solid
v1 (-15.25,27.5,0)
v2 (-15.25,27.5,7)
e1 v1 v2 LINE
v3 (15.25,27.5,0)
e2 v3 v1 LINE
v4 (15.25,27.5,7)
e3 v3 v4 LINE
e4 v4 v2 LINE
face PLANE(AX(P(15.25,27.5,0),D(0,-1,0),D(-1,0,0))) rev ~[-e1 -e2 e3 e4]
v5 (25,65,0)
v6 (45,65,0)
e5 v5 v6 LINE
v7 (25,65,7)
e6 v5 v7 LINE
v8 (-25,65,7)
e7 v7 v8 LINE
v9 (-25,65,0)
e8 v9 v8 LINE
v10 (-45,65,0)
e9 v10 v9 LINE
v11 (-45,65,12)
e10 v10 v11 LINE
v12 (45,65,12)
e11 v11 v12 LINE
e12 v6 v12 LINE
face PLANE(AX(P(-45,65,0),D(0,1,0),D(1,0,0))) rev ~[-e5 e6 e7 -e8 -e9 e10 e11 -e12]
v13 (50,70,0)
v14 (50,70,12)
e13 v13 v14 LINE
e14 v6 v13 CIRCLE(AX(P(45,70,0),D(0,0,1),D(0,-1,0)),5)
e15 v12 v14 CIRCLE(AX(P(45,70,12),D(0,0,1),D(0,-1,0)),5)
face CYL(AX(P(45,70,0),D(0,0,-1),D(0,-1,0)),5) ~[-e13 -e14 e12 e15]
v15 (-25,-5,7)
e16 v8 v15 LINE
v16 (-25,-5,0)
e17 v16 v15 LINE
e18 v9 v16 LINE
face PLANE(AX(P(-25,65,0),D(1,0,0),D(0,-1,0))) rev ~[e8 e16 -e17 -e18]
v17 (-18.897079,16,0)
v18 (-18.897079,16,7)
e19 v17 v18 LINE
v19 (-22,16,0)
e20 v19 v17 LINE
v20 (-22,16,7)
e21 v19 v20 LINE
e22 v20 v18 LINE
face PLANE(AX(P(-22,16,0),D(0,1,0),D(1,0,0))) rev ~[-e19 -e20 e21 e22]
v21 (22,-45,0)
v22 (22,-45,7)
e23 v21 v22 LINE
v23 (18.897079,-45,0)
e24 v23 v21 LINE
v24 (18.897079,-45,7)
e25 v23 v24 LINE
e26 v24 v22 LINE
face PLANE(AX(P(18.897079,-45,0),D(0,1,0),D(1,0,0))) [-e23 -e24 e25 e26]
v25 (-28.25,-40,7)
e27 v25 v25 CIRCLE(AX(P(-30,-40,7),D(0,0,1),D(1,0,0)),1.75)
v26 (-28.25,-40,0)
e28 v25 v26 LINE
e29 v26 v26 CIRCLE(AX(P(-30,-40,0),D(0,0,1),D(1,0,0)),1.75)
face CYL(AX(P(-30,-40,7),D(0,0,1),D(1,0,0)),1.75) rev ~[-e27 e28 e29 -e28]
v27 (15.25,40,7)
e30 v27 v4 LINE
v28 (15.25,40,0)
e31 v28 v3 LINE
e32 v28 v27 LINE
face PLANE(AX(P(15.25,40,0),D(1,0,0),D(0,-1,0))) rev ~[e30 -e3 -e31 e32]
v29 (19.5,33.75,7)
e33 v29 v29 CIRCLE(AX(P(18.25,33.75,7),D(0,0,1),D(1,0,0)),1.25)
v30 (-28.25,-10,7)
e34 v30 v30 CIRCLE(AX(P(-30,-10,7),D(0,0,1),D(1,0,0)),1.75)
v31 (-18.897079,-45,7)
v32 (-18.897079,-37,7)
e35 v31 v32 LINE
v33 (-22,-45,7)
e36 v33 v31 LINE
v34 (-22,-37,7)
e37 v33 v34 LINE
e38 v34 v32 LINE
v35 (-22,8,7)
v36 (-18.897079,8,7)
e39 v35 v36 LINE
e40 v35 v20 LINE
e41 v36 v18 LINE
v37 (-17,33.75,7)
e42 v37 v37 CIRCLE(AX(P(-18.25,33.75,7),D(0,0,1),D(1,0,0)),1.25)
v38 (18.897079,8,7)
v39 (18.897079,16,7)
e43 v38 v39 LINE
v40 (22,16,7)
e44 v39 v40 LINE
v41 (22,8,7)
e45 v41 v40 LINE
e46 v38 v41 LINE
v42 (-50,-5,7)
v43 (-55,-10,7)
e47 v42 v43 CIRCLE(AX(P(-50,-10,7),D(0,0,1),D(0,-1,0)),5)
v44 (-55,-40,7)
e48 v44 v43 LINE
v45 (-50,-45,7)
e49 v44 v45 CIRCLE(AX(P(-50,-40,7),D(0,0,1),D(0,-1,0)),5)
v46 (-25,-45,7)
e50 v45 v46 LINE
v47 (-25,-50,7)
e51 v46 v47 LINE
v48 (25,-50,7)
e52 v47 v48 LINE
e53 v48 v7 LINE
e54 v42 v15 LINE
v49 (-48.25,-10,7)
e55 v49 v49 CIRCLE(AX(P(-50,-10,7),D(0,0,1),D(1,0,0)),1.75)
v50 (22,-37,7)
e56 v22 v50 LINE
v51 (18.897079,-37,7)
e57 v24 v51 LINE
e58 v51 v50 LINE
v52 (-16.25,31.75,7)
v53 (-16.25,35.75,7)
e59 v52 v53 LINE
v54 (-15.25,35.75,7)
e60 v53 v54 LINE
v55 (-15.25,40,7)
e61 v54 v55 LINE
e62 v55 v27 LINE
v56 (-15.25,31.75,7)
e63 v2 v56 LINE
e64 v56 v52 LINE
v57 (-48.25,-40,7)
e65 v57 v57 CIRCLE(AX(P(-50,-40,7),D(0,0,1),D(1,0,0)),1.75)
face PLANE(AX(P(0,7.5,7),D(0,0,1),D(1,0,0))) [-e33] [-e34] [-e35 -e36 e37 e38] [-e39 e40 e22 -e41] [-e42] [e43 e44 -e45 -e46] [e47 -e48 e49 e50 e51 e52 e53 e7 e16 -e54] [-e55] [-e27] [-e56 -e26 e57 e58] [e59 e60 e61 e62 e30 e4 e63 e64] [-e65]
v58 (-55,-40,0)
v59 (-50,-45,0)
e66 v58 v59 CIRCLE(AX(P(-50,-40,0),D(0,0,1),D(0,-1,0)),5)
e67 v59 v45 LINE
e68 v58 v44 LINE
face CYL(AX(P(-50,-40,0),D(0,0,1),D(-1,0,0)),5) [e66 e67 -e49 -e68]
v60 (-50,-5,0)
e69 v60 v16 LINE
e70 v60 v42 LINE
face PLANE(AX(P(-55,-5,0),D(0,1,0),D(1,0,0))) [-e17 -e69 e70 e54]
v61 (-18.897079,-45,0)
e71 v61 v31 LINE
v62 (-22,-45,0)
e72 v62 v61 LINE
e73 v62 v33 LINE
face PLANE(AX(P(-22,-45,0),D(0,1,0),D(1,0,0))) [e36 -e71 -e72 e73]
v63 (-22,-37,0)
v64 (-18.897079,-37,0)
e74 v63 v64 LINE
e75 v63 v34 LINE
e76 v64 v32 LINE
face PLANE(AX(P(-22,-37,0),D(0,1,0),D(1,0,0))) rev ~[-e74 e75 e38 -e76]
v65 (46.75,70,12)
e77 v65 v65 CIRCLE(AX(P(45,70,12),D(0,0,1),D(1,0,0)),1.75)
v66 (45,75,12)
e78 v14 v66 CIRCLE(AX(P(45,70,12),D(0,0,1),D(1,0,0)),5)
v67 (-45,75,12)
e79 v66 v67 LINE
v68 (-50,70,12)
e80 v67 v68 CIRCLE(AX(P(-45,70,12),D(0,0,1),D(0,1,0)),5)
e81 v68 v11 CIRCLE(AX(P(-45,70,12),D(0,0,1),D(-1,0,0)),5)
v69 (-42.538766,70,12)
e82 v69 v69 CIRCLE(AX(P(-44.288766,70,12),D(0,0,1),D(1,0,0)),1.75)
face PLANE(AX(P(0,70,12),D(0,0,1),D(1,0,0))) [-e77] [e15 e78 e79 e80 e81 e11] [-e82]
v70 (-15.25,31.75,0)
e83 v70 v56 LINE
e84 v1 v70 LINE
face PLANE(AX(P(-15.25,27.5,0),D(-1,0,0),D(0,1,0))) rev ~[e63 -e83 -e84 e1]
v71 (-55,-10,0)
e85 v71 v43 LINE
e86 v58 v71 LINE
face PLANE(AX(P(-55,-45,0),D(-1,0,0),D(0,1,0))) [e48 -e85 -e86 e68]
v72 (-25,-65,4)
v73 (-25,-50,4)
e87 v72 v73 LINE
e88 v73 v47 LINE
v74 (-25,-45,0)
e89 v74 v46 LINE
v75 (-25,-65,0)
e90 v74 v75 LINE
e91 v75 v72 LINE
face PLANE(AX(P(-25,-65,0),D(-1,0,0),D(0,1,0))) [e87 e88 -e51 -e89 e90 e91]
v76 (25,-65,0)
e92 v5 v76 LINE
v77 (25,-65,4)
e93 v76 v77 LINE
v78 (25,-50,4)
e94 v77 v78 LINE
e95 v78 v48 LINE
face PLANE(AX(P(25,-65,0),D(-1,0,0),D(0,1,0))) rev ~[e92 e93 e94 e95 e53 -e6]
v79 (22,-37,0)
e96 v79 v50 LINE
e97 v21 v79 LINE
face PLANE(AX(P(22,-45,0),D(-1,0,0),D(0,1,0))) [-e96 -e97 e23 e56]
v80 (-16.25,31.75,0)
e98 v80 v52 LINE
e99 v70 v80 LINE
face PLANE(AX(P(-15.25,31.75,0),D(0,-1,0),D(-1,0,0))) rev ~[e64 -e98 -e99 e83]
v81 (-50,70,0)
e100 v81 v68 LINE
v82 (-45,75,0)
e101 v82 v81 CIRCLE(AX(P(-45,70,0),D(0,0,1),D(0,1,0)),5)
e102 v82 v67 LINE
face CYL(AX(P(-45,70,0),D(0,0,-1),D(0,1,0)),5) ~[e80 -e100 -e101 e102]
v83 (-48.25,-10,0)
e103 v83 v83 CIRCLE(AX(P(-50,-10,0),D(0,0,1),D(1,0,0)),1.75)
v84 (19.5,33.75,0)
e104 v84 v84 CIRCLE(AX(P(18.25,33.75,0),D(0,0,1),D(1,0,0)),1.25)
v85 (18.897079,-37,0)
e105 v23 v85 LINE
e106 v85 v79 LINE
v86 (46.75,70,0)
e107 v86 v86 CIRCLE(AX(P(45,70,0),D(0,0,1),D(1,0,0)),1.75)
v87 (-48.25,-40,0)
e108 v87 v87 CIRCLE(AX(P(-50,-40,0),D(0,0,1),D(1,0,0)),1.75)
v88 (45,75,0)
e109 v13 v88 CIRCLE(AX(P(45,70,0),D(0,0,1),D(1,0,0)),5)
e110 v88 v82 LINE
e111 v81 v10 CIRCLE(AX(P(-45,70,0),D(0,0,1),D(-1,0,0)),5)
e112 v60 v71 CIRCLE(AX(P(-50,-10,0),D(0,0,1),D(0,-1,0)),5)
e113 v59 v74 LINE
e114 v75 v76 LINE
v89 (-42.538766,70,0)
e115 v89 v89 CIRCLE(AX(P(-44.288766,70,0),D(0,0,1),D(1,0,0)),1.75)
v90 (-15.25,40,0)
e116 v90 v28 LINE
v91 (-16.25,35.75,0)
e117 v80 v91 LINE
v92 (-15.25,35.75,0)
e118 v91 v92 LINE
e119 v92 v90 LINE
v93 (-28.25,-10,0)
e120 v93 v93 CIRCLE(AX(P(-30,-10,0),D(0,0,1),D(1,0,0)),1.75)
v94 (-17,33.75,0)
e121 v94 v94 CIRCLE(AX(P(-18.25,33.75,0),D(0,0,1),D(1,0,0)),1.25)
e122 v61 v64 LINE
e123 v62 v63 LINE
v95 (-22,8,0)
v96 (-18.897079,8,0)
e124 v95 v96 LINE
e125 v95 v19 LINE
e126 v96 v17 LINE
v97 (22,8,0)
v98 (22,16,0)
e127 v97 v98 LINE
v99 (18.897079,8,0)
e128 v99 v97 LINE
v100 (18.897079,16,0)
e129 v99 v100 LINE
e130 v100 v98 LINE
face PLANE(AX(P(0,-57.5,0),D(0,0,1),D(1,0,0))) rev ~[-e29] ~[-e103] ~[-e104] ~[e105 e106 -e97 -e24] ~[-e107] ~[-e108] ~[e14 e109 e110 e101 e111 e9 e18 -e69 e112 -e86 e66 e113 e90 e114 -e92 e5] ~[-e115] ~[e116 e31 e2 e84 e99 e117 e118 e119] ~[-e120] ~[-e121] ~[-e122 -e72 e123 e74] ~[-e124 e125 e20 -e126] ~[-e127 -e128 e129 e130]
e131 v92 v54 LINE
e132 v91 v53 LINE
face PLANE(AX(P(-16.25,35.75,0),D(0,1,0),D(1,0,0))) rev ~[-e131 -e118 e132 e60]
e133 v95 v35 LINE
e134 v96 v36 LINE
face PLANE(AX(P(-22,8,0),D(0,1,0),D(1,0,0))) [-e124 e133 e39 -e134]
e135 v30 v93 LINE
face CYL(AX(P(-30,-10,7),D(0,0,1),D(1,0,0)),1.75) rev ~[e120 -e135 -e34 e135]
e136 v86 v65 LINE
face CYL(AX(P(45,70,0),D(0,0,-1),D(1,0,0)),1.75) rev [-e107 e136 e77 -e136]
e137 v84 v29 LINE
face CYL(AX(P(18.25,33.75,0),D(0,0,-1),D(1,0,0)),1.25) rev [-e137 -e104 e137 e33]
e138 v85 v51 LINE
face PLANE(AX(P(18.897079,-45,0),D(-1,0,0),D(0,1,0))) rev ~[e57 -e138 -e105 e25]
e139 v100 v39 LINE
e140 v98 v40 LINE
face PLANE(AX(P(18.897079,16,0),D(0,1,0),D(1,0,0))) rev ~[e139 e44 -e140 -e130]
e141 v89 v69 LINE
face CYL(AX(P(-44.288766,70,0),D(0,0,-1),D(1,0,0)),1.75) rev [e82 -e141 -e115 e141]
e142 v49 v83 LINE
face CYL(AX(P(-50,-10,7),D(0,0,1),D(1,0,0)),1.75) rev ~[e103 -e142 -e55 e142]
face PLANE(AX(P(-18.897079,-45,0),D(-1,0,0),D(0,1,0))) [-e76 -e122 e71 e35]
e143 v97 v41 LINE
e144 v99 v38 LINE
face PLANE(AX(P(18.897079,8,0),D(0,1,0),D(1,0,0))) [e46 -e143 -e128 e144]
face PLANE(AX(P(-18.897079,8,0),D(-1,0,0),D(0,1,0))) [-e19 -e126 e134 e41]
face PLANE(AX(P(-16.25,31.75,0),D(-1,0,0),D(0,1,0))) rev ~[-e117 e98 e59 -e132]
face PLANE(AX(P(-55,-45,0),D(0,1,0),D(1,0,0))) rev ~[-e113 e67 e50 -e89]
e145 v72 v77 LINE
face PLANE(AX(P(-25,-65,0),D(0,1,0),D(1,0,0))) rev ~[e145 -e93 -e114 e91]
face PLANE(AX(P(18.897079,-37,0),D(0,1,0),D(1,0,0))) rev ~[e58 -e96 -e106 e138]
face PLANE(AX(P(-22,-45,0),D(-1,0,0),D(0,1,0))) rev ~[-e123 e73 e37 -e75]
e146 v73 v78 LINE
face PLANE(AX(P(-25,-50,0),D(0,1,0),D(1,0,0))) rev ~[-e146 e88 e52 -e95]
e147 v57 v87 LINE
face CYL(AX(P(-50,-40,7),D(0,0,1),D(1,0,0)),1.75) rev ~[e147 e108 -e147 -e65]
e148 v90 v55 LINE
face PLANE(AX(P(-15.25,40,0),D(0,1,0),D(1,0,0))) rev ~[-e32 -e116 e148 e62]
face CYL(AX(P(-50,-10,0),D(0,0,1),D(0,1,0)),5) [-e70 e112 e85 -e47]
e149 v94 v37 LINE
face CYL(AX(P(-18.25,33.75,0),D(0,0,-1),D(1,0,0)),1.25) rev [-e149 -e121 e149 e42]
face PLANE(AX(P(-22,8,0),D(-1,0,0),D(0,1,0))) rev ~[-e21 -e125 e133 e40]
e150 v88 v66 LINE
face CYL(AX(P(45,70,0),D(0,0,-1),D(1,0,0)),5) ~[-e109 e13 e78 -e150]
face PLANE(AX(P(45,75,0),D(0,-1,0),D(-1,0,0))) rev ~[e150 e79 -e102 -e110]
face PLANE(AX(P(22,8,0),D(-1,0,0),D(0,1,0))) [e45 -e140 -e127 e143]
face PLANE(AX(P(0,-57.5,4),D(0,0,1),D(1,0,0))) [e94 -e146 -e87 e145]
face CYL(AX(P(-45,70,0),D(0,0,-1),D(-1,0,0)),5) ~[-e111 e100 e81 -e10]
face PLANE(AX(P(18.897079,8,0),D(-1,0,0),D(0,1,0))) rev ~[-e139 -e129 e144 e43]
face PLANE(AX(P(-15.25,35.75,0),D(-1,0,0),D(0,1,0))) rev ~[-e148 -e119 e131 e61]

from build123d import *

# Parameters (mm, degrees)
F0_W     = 3.1029209495
F0_H     = 8
F0_R     = 1.25
F1_DEPTH = 7
F0_R_2   = 1.75
F2_DEPTH = 12
F0_W_2   = 30
F0_H_2   = 40
F3_DEPTH = 7
F4_R     = 5
F5_R     = 1.75
F6_DEPTH = 25
F0_W_3   = 50
F0_H_3   = 15
F7_DEPTH = 4


with BuildPart() as f1:
    # F0 (on Top) → F1 (new body)
    with BuildSketch(Plane.XY):
        Polygon((25, -50), (25, 65), (-25, 65), (-25, -5), (-25, -45), (-25, -50), align=None)
        with Locations((-20.4485395253, -41)):
            Rectangle(F0_W, F0_H, mode=Mode.SUBTRACT)
        with Locations((20.4485395253, -41)):
            Rectangle(F0_W, F0_H, mode=Mode.SUBTRACT)
        with Locations((-20.4485395253, 12)):
            Rectangle(F0_W, F0_H, mode=Mode.SUBTRACT)
        with Locations((-18.25, 33.75)):
            Circle(F0_R, mode=Mode.SUBTRACT)
        with Locations((20.4485395253, 12)):
            Rectangle(F0_W, F0_H, mode=Mode.SUBTRACT)
        Polygon((15.25, 40), (15.25, 27.5), (-15.25, 27.5), (-15.25, 31.75), (-16.25, 31.75), (-16.25, 35.75), (-15.25, 35.75), (-15.25, 40), align=None, mode=Mode.SUBTRACT)
        with Locations((18.25, 33.75)):
            Circle(F0_R, mode=Mode.SUBTRACT)
    extrude(amount=F1_DEPTH)

    # F0 (on Top) → F2 (join)
    with BuildSketch(Plane.XY):
        with BuildLine():
            Line((-25, 65), (25, 65))
            Line((25, 65), (45, 65))
            ThreePointArc((45, 65), (48.5355339059, 66.4644660941), (50, 70))
            ThreePointArc((50, 70), (48.5355339059, 73.5355339059), (45, 75))
            Line((45, 75), (-45, 75))
            ThreePointArc((-45, 75), (-48.5355339059, 73.5355339059), (-50, 70))
            ThreePointArc((-50, 70), (-48.5355339059, 66.4644660941), (-45, 65))
            Line((-45, 65), (-25, 65))
        make_face()
        with Locations((-44.2887660861, 70)):
            Circle(F0_R_2, mode=Mode.SUBTRACT)
        with Locations((45, 70)):
            Circle(F0_R_2, mode=Mode.SUBTRACT)
    extrude(amount=F2_DEPTH)

    # F0 (on Top) → F3 (join)
    with BuildSketch(Plane.XY):
        with Locations((-40, -25)):
            Rectangle(F0_W_2, F0_H_2)
    extrude(amount=F3_DEPTH)

    # F4
    f4_edges = [f1.edges().sort_by_distance(p)[0] for p in [
        (-55, -5, 3.5),
        (-55, -45, 3.5),
    ]]
    fillet(f4_edges, radius=F4_R)

    # F5 (on face) → F6 (cut)
    with BuildSketch(Plane.XY.offset(7)):
        with Locations((-50, -10)):
            Circle(F5_R)
        with Locations((-30, -10)):
            Circle(F5_R)
        with Locations((-30, -40)):
            Circle(F5_R)
        with Locations((-50, -40)):
            Circle(F5_R)
    extrude(amount=-F6_DEPTH, mode=Mode.SUBTRACT)

    # F0 (on Top) → F7 (join)
    with BuildSketch(Plane.XY):
        with Locations((0, -57.5)):
            Rectangle(F0_W_3, F0_H_3)
    extrude(amount=F7_DEPTH)


solid = f1.part
